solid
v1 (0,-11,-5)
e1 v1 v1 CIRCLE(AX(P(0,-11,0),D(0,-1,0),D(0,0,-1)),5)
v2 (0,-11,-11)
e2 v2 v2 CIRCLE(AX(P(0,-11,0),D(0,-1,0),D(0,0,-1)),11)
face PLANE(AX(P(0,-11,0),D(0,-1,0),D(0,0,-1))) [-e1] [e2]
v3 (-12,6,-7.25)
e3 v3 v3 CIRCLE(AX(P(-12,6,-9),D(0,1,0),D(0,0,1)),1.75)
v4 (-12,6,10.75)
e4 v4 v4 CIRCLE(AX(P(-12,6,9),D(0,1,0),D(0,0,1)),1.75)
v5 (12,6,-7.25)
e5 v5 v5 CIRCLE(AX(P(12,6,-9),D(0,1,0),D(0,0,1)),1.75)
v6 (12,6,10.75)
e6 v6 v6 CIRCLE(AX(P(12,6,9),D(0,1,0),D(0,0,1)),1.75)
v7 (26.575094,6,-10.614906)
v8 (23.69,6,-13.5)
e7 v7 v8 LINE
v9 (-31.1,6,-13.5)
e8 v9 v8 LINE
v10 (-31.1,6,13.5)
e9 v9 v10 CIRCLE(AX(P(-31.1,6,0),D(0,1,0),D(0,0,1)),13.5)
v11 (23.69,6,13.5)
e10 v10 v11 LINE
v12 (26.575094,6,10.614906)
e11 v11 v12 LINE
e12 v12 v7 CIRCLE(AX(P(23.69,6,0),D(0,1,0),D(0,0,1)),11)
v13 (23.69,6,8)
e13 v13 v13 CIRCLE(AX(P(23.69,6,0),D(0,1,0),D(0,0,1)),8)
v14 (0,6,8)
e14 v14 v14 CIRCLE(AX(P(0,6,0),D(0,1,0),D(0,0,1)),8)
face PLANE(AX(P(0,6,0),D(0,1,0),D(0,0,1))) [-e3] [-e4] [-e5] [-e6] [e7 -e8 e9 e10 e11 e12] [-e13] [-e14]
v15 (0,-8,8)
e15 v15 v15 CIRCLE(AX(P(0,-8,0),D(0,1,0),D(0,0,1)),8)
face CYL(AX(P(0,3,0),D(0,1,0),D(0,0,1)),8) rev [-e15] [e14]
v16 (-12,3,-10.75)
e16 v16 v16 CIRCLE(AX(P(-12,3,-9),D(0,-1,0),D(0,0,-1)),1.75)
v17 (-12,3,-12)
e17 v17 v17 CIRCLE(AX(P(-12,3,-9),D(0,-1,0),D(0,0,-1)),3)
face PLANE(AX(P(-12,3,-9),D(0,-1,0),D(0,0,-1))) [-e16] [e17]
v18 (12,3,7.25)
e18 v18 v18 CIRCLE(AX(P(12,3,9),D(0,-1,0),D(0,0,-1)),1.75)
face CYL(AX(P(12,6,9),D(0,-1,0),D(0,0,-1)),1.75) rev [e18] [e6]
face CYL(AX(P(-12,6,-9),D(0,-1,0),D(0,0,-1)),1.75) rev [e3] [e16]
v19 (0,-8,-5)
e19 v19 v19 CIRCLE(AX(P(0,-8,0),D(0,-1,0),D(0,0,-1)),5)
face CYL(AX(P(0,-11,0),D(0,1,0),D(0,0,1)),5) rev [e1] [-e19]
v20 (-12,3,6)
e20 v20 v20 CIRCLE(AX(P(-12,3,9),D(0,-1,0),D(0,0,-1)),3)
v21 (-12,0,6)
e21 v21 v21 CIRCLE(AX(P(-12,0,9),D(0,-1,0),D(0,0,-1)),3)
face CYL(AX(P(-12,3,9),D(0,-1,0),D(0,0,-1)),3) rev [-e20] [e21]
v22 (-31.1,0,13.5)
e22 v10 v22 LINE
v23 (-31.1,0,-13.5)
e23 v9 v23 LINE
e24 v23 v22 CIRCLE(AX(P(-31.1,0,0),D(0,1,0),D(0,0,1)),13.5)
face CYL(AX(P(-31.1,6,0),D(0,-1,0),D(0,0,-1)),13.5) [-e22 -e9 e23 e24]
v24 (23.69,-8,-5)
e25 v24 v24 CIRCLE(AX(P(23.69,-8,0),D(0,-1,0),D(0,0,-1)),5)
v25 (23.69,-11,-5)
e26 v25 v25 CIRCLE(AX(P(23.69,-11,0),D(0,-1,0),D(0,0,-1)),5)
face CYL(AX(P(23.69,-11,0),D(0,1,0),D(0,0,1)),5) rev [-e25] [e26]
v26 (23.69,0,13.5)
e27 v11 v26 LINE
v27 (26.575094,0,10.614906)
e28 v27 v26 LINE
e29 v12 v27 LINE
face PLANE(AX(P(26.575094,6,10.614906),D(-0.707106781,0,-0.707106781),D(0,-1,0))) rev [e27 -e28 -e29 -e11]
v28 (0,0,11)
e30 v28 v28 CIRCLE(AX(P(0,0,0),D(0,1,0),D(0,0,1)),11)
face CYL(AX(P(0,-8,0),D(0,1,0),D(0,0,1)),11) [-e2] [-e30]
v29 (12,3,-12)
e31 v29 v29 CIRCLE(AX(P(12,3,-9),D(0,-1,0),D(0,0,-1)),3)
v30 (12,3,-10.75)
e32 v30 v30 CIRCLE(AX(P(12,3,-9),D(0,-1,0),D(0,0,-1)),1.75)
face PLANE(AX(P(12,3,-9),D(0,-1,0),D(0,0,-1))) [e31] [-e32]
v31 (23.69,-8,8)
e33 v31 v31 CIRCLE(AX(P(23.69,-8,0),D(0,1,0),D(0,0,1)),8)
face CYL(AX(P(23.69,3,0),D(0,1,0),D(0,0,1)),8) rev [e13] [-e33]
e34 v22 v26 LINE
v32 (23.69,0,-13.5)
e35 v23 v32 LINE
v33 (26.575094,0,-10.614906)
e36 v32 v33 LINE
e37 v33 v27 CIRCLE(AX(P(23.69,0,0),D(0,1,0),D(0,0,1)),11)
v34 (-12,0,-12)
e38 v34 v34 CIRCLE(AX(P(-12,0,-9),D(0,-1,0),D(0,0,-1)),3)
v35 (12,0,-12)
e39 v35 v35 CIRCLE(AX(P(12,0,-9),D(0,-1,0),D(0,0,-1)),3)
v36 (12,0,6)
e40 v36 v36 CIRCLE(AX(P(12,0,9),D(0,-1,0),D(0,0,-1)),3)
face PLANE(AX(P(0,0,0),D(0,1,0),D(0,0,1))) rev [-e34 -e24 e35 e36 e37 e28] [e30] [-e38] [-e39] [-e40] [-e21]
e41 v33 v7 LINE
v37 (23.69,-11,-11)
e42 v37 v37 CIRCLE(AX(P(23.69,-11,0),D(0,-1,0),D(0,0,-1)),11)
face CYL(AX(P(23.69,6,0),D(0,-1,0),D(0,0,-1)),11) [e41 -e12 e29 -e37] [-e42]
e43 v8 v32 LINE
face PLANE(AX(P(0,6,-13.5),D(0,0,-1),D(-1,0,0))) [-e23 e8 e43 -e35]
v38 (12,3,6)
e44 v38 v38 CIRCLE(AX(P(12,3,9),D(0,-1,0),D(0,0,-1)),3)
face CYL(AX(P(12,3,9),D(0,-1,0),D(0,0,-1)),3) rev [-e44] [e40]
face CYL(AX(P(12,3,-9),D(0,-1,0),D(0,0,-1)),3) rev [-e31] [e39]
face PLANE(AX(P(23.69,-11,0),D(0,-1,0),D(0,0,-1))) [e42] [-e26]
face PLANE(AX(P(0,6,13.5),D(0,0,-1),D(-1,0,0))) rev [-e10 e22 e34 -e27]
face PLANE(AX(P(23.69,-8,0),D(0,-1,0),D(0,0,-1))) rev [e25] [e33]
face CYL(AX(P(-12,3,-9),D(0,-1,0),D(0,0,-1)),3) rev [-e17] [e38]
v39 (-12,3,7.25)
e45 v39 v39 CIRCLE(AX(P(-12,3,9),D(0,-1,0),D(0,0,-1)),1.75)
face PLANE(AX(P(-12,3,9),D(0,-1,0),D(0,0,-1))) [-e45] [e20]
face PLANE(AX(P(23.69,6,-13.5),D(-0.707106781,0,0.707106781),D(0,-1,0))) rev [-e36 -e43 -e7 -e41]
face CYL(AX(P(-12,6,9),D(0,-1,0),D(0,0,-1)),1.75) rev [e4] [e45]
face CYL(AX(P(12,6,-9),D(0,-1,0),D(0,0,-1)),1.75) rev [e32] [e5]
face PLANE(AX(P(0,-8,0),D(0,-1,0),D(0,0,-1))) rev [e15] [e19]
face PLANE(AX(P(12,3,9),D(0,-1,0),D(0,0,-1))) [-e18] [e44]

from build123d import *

# Parameters (mm, degrees)
SKETCH1_R               = 1.75
SKETCH1_R_2             = 5
BOSS_EXTRUDE1_DEPTH     = 6
SKETCH2_R               = 3
SKETCH2_R_2             = 1.75
CUT_EXTRUDE1_DEPTH      = 3
CUT_EXTRUDE2_START      = -3
SKETCH3_R               = 8
SKETCH3_R_2             = 5
CUT_EXTRUDE2_DEPTH      = 3
SKETCH5_R               = 13.5
BOSS_EXTRUDE2_DEPTH     = 6
CUT_EXTRUDE3_DEPTH      = 47.983082062
CUT_EXTRUDE3_DEPTH_BACK = 47.983082062
SKETCH6_R               = 8
BOSS_EXTRUDE6_START     = -8
SKETCH9_R               = 11
SKETCH9_R_2             = 8
BOSS_EXTRUDE6_DEPTH     = 8
BOSS_EXTRUDE7_START     = 3
SKETCH10_R              = 11
SKETCH10_R_2            = 5
BOSS_EXTRUDE7_DEPTH     = 3
CHAMFER3_SIZE           = 2.5


with BuildPart() as part:
    # Sketch1 → Boss-Extrude1 (new body)
    with BuildSketch(Plane(origin=(0, 0, 0), x_dir=(1, 0, 0), z_dir=(0, 1, 0))):
        with BuildLine():
            Line((23.69, 13.5), (-31.1, 13.5))
            Line((-31.1, 13.5), (-31.1, 10.5))
            ThreePointArc((-31.1, 10.5), (-20.6, 0), (-31.1, -10.5))
            Line((-31.1, -10.5), (-31.1, -13.5))
            Line((-31.1, -13.5), (23.69, -13.5))
            Line((23.69, -13.5), (23.69, -11))
            ThreePointArc((23.69, -11), (34.69, 0), (23.69, 11))
            Line((23.69, 11), (23.69, 13.5))
        make_face()
        with Locations(Location((-12, -9, 0), (0, 0, 270))):
            Circle(SKETCH1_R, mode=Mode.SUBTRACT)
        with Locations(Location((12, -9, 0), (0, 0, 270))):
            Circle(SKETCH1_R, mode=Mode.SUBTRACT)
        with Locations(Location((-12, 9, 0), (0, 0, 270))):
            Circle(SKETCH1_R, mode=Mode.SUBTRACT)
        with Locations(Location((0, 0, 0), (0, 0, 270))):
            Circle(SKETCH1_R_2, mode=Mode.SUBTRACT)
        with Locations(Location((12, 9, 0), (0, 0, 270))):
            Circle(SKETCH1_R, mode=Mode.SUBTRACT)
        with Locations(Location((23.69, 0, 0), (0, 0, 270))):
            Circle(SKETCH1_R_2, mode=Mode.SUBTRACT)
    extrude(amount=BOSS_EXTRUDE1_DEPTH)

    # Sketch2 → Cut-Extrude1 (cut)
    # profile 1 of 4: a face of its own
    with BuildSketch(Plane.XZ):
        with Locations(Location((-12, -9, 0), (0, 0, 270))):
            Circle(SKETCH2_R)
        with Locations(Location((-12, -9, 0), (0, 0, 270))):
            Circle(SKETCH2_R_2, mode=Mode.SUBTRACT)
    # profile 2 of 4: a face of its own
    with BuildSketch(Plane.XZ):
        with Locations(Location((-12, 9, 0), (0, 0, 270))):
            Circle(SKETCH2_R)
        with Locations(Location((-12, 9, 0), (0, 0, 270))):
            Circle(SKETCH2_R_2, mode=Mode.SUBTRACT)
    # profile 3 of 4: a face of its own
    with BuildSketch(Plane.XZ):
        with Locations(Location((12, 9, 0), (0, 0, 270))):
            Circle(SKETCH2_R)
        with Locations(Location((12, 9, 0), (0, 0, 270))):
            Circle(SKETCH2_R_2, mode=Mode.SUBTRACT)
    # profile 4 of 4: a face of its own
    with BuildSketch(Plane.XZ):
        with Locations(Location((12, -9, 0), (0, 0, 270))):
            Circle(SKETCH2_R)
        with Locations(Location((12, -9, 0), (0, 0, 270))):
            Circle(SKETCH2_R_2, mode=Mode.SUBTRACT)
    extrude(amount=-CUT_EXTRUDE1_DEPTH, mode=Mode.SUBTRACT)

    # Sketch3 → Cut-Extrude2 (cut)
    # profile 1 of 2: a face of its own
    with BuildSketch(Plane(origin=(0, 6, 0), x_dir=(1, 0, 0), z_dir=(0, 1, 0)).offset(CUT_EXTRUDE2_START)):
        with Locations(Location((0, 0, 0), (0, 0, 270))):
            Circle(SKETCH3_R)
        with Locations(Location((0, 0, 0), (0, 0, 270))):
            Circle(SKETCH3_R_2, mode=Mode.SUBTRACT)
    # profile 2 of 2: a face of its own
    with BuildSketch(Plane(origin=(0, 6, 0), x_dir=(1, 0, 0), z_dir=(0, 1, 0)).offset(CUT_EXTRUDE2_START)):
        with Locations(Location((23.69, 0, 0), (0, 0, 270))):
            Circle(SKETCH3_R)
        with Locations(Location((23.69, 0, 0), (0, 0, 270))):
            Circle(SKETCH3_R_2, mode=Mode.SUBTRACT)
    extrude(amount=CUT_EXTRUDE2_DEPTH, mode=Mode.SUBTRACT)

    # Sketch5 → Boss-Extrude2 (add)
    with BuildSketch(Plane(origin=(0, 0, 0), x_dir=(1, 0, 0), z_dir=(0, 1, 0))):
        with Locations((-31.1, 0)):
            Circle(SKETCH5_R)
    extrude(amount=BOSS_EXTRUDE2_DEPTH)

    # Sketch6 → Cut-Extrude3 (cut, two sides: drawn at the far end of the back side and taken through both)
    with BuildSketch(Plane(origin=(0, 6, 0), x_dir=(1, 0, 0), z_dir=(0, 1, 0)).offset(-CUT_EXTRUDE3_DEPTH_BACK)):
        with Locations(Location((0, 0, 0), (0, 0, 270))):
            Circle(SKETCH6_R)
        with Locations(Location((23.69, 0, 0), (0, 0, 270))):
            Circle(SKETCH6_R)
    extrude(amount=CUT_EXTRUDE3_DEPTH + CUT_EXTRUDE3_DEPTH_BACK, mode=Mode.SUBTRACT)

    # Sketch9 → Boss-Extrude6 (add)
    # profile 1 of 2: a face of its own
    with BuildSketch(Plane(origin=(0, 0, 0), x_dir=(1, 0, 0), z_dir=(0, 1, 0)).offset(BOSS_EXTRUDE6_START)):
        with Locations(Location((0, 0, 0), (0, 0, 270))):
            Circle(SKETCH9_R)
        with Locations(Location((0, 0, 0), (0, 0, 270))):
            Circle(SKETCH9_R_2, mode=Mode.SUBTRACT)
    # profile 2 of 2: a face of its own
    with BuildSketch(Plane(origin=(0, 0, 0), x_dir=(1, 0, 0), z_dir=(0, 1, 0)).offset(BOSS_EXTRUDE6_START)):
        with BuildLine():
            ThreePointArc((23.69, 11), (12.69, 0), (23.69, -11))
            ThreePointArc((23.69, -11), (31.468174593, -7.778174593), (34.69, 0))
            ThreePointArc((34.69, 0), (31.468174593, 7.778174593), (23.69, 11))
        make_face()
        with Locations(Location((23.69, 0, 0), (0, 0, 270))):
            Circle(SKETCH9_R_2, mode=Mode.SUBTRACT)
    extrude(amount=BOSS_EXTRUDE6_DEPTH)

    # Sketch10 → Boss-Extrude7 (add)
    # profile 1 of 2: a face of its own
    with BuildSketch(Plane.XZ.offset(8).offset(BOSS_EXTRUDE7_START)):
        with Locations(Location((23.69, 0, 0), (0, 0, 270))):
            Circle(SKETCH10_R)
        with Locations(Location((23.69, 0, 0), (0, 0, 270))):
            Circle(SKETCH10_R_2, mode=Mode.SUBTRACT)
    # profile 2 of 2: a face of its own
    with BuildSketch(Plane.XZ.offset(8).offset(BOSS_EXTRUDE7_START)):
        with Locations(Location((0, 0, 0), (0, 0, 90))):
            Circle(SKETCH10_R)
        with Locations(Location((0, 0, 0), (0, 0, 270))):
            Circle(SKETCH10_R_2, mode=Mode.SUBTRACT)
    extrude(amount=-BOSS_EXTRUDE7_DEPTH)

    # Chamfer3
    # the kernel refuses this chamfer: 2.5 mm, written as the material it adds along each edge
    with BuildSketch(Plane(origin=(23.69, 0, 11), x_dir=(0.9912092295509808, 0, -0.13230367815352337), z_dir=(0, 1, 0))) as chamfer3_piece_1_section:
        with BuildLine():
            Line((2.910680919, 0), (-CHAMFER3_SIZE * 0.132303678154, -CHAMFER3_SIZE * 0.991209229551))
            Line((-CHAMFER3_SIZE * 0.132303678154, -CHAMFER3_SIZE * 0.991209229551), (0, 0))
            ThreePointArc((0, 0), (1.49552658, -0.096625069), (2.910680919, 0))
        make_face()
    chamfer3_piece_1 = extrude(amount=6, mode=Mode.PRIVATE)
    chamfer3_piece_1 = split(chamfer3_piece_1, bisect_by=Plane(origin=(23.69, 0, 13.5), z_dir=(0, 0, -1)), keep=Keep.TOP, mode=Mode.PRIVATE)
    add(chamfer3_piece_1)
    with BuildSketch(Plane(origin=(23.69, 0, -11), x_dir=(0, 0, -1), z_dir=(0, 1, 0))) as chamfer3_piece_2_section:
        with BuildLine():
            Line((CHAMFER3_SIZE, 0), (-0.385093792, -2.885093792))
            ThreePointArc((-0.385093792, -2.885093792), (-0.102088007, -1.495163601), (0, 0))
            Line((0, 0), (CHAMFER3_SIZE, 0))
        make_face()
    chamfer3_piece_2 = extrude(amount=6, mode=Mode.PRIVATE)
    chamfer3_piece_2 = split(chamfer3_piece_2, bisect_by=Plane(origin=(23.69, 0, -13.5), z_dir=(0, 0, 1)), keep=Keep.TOP, mode=Mode.PRIVATE)
    add(chamfer3_piece_2)


solid = part.part
